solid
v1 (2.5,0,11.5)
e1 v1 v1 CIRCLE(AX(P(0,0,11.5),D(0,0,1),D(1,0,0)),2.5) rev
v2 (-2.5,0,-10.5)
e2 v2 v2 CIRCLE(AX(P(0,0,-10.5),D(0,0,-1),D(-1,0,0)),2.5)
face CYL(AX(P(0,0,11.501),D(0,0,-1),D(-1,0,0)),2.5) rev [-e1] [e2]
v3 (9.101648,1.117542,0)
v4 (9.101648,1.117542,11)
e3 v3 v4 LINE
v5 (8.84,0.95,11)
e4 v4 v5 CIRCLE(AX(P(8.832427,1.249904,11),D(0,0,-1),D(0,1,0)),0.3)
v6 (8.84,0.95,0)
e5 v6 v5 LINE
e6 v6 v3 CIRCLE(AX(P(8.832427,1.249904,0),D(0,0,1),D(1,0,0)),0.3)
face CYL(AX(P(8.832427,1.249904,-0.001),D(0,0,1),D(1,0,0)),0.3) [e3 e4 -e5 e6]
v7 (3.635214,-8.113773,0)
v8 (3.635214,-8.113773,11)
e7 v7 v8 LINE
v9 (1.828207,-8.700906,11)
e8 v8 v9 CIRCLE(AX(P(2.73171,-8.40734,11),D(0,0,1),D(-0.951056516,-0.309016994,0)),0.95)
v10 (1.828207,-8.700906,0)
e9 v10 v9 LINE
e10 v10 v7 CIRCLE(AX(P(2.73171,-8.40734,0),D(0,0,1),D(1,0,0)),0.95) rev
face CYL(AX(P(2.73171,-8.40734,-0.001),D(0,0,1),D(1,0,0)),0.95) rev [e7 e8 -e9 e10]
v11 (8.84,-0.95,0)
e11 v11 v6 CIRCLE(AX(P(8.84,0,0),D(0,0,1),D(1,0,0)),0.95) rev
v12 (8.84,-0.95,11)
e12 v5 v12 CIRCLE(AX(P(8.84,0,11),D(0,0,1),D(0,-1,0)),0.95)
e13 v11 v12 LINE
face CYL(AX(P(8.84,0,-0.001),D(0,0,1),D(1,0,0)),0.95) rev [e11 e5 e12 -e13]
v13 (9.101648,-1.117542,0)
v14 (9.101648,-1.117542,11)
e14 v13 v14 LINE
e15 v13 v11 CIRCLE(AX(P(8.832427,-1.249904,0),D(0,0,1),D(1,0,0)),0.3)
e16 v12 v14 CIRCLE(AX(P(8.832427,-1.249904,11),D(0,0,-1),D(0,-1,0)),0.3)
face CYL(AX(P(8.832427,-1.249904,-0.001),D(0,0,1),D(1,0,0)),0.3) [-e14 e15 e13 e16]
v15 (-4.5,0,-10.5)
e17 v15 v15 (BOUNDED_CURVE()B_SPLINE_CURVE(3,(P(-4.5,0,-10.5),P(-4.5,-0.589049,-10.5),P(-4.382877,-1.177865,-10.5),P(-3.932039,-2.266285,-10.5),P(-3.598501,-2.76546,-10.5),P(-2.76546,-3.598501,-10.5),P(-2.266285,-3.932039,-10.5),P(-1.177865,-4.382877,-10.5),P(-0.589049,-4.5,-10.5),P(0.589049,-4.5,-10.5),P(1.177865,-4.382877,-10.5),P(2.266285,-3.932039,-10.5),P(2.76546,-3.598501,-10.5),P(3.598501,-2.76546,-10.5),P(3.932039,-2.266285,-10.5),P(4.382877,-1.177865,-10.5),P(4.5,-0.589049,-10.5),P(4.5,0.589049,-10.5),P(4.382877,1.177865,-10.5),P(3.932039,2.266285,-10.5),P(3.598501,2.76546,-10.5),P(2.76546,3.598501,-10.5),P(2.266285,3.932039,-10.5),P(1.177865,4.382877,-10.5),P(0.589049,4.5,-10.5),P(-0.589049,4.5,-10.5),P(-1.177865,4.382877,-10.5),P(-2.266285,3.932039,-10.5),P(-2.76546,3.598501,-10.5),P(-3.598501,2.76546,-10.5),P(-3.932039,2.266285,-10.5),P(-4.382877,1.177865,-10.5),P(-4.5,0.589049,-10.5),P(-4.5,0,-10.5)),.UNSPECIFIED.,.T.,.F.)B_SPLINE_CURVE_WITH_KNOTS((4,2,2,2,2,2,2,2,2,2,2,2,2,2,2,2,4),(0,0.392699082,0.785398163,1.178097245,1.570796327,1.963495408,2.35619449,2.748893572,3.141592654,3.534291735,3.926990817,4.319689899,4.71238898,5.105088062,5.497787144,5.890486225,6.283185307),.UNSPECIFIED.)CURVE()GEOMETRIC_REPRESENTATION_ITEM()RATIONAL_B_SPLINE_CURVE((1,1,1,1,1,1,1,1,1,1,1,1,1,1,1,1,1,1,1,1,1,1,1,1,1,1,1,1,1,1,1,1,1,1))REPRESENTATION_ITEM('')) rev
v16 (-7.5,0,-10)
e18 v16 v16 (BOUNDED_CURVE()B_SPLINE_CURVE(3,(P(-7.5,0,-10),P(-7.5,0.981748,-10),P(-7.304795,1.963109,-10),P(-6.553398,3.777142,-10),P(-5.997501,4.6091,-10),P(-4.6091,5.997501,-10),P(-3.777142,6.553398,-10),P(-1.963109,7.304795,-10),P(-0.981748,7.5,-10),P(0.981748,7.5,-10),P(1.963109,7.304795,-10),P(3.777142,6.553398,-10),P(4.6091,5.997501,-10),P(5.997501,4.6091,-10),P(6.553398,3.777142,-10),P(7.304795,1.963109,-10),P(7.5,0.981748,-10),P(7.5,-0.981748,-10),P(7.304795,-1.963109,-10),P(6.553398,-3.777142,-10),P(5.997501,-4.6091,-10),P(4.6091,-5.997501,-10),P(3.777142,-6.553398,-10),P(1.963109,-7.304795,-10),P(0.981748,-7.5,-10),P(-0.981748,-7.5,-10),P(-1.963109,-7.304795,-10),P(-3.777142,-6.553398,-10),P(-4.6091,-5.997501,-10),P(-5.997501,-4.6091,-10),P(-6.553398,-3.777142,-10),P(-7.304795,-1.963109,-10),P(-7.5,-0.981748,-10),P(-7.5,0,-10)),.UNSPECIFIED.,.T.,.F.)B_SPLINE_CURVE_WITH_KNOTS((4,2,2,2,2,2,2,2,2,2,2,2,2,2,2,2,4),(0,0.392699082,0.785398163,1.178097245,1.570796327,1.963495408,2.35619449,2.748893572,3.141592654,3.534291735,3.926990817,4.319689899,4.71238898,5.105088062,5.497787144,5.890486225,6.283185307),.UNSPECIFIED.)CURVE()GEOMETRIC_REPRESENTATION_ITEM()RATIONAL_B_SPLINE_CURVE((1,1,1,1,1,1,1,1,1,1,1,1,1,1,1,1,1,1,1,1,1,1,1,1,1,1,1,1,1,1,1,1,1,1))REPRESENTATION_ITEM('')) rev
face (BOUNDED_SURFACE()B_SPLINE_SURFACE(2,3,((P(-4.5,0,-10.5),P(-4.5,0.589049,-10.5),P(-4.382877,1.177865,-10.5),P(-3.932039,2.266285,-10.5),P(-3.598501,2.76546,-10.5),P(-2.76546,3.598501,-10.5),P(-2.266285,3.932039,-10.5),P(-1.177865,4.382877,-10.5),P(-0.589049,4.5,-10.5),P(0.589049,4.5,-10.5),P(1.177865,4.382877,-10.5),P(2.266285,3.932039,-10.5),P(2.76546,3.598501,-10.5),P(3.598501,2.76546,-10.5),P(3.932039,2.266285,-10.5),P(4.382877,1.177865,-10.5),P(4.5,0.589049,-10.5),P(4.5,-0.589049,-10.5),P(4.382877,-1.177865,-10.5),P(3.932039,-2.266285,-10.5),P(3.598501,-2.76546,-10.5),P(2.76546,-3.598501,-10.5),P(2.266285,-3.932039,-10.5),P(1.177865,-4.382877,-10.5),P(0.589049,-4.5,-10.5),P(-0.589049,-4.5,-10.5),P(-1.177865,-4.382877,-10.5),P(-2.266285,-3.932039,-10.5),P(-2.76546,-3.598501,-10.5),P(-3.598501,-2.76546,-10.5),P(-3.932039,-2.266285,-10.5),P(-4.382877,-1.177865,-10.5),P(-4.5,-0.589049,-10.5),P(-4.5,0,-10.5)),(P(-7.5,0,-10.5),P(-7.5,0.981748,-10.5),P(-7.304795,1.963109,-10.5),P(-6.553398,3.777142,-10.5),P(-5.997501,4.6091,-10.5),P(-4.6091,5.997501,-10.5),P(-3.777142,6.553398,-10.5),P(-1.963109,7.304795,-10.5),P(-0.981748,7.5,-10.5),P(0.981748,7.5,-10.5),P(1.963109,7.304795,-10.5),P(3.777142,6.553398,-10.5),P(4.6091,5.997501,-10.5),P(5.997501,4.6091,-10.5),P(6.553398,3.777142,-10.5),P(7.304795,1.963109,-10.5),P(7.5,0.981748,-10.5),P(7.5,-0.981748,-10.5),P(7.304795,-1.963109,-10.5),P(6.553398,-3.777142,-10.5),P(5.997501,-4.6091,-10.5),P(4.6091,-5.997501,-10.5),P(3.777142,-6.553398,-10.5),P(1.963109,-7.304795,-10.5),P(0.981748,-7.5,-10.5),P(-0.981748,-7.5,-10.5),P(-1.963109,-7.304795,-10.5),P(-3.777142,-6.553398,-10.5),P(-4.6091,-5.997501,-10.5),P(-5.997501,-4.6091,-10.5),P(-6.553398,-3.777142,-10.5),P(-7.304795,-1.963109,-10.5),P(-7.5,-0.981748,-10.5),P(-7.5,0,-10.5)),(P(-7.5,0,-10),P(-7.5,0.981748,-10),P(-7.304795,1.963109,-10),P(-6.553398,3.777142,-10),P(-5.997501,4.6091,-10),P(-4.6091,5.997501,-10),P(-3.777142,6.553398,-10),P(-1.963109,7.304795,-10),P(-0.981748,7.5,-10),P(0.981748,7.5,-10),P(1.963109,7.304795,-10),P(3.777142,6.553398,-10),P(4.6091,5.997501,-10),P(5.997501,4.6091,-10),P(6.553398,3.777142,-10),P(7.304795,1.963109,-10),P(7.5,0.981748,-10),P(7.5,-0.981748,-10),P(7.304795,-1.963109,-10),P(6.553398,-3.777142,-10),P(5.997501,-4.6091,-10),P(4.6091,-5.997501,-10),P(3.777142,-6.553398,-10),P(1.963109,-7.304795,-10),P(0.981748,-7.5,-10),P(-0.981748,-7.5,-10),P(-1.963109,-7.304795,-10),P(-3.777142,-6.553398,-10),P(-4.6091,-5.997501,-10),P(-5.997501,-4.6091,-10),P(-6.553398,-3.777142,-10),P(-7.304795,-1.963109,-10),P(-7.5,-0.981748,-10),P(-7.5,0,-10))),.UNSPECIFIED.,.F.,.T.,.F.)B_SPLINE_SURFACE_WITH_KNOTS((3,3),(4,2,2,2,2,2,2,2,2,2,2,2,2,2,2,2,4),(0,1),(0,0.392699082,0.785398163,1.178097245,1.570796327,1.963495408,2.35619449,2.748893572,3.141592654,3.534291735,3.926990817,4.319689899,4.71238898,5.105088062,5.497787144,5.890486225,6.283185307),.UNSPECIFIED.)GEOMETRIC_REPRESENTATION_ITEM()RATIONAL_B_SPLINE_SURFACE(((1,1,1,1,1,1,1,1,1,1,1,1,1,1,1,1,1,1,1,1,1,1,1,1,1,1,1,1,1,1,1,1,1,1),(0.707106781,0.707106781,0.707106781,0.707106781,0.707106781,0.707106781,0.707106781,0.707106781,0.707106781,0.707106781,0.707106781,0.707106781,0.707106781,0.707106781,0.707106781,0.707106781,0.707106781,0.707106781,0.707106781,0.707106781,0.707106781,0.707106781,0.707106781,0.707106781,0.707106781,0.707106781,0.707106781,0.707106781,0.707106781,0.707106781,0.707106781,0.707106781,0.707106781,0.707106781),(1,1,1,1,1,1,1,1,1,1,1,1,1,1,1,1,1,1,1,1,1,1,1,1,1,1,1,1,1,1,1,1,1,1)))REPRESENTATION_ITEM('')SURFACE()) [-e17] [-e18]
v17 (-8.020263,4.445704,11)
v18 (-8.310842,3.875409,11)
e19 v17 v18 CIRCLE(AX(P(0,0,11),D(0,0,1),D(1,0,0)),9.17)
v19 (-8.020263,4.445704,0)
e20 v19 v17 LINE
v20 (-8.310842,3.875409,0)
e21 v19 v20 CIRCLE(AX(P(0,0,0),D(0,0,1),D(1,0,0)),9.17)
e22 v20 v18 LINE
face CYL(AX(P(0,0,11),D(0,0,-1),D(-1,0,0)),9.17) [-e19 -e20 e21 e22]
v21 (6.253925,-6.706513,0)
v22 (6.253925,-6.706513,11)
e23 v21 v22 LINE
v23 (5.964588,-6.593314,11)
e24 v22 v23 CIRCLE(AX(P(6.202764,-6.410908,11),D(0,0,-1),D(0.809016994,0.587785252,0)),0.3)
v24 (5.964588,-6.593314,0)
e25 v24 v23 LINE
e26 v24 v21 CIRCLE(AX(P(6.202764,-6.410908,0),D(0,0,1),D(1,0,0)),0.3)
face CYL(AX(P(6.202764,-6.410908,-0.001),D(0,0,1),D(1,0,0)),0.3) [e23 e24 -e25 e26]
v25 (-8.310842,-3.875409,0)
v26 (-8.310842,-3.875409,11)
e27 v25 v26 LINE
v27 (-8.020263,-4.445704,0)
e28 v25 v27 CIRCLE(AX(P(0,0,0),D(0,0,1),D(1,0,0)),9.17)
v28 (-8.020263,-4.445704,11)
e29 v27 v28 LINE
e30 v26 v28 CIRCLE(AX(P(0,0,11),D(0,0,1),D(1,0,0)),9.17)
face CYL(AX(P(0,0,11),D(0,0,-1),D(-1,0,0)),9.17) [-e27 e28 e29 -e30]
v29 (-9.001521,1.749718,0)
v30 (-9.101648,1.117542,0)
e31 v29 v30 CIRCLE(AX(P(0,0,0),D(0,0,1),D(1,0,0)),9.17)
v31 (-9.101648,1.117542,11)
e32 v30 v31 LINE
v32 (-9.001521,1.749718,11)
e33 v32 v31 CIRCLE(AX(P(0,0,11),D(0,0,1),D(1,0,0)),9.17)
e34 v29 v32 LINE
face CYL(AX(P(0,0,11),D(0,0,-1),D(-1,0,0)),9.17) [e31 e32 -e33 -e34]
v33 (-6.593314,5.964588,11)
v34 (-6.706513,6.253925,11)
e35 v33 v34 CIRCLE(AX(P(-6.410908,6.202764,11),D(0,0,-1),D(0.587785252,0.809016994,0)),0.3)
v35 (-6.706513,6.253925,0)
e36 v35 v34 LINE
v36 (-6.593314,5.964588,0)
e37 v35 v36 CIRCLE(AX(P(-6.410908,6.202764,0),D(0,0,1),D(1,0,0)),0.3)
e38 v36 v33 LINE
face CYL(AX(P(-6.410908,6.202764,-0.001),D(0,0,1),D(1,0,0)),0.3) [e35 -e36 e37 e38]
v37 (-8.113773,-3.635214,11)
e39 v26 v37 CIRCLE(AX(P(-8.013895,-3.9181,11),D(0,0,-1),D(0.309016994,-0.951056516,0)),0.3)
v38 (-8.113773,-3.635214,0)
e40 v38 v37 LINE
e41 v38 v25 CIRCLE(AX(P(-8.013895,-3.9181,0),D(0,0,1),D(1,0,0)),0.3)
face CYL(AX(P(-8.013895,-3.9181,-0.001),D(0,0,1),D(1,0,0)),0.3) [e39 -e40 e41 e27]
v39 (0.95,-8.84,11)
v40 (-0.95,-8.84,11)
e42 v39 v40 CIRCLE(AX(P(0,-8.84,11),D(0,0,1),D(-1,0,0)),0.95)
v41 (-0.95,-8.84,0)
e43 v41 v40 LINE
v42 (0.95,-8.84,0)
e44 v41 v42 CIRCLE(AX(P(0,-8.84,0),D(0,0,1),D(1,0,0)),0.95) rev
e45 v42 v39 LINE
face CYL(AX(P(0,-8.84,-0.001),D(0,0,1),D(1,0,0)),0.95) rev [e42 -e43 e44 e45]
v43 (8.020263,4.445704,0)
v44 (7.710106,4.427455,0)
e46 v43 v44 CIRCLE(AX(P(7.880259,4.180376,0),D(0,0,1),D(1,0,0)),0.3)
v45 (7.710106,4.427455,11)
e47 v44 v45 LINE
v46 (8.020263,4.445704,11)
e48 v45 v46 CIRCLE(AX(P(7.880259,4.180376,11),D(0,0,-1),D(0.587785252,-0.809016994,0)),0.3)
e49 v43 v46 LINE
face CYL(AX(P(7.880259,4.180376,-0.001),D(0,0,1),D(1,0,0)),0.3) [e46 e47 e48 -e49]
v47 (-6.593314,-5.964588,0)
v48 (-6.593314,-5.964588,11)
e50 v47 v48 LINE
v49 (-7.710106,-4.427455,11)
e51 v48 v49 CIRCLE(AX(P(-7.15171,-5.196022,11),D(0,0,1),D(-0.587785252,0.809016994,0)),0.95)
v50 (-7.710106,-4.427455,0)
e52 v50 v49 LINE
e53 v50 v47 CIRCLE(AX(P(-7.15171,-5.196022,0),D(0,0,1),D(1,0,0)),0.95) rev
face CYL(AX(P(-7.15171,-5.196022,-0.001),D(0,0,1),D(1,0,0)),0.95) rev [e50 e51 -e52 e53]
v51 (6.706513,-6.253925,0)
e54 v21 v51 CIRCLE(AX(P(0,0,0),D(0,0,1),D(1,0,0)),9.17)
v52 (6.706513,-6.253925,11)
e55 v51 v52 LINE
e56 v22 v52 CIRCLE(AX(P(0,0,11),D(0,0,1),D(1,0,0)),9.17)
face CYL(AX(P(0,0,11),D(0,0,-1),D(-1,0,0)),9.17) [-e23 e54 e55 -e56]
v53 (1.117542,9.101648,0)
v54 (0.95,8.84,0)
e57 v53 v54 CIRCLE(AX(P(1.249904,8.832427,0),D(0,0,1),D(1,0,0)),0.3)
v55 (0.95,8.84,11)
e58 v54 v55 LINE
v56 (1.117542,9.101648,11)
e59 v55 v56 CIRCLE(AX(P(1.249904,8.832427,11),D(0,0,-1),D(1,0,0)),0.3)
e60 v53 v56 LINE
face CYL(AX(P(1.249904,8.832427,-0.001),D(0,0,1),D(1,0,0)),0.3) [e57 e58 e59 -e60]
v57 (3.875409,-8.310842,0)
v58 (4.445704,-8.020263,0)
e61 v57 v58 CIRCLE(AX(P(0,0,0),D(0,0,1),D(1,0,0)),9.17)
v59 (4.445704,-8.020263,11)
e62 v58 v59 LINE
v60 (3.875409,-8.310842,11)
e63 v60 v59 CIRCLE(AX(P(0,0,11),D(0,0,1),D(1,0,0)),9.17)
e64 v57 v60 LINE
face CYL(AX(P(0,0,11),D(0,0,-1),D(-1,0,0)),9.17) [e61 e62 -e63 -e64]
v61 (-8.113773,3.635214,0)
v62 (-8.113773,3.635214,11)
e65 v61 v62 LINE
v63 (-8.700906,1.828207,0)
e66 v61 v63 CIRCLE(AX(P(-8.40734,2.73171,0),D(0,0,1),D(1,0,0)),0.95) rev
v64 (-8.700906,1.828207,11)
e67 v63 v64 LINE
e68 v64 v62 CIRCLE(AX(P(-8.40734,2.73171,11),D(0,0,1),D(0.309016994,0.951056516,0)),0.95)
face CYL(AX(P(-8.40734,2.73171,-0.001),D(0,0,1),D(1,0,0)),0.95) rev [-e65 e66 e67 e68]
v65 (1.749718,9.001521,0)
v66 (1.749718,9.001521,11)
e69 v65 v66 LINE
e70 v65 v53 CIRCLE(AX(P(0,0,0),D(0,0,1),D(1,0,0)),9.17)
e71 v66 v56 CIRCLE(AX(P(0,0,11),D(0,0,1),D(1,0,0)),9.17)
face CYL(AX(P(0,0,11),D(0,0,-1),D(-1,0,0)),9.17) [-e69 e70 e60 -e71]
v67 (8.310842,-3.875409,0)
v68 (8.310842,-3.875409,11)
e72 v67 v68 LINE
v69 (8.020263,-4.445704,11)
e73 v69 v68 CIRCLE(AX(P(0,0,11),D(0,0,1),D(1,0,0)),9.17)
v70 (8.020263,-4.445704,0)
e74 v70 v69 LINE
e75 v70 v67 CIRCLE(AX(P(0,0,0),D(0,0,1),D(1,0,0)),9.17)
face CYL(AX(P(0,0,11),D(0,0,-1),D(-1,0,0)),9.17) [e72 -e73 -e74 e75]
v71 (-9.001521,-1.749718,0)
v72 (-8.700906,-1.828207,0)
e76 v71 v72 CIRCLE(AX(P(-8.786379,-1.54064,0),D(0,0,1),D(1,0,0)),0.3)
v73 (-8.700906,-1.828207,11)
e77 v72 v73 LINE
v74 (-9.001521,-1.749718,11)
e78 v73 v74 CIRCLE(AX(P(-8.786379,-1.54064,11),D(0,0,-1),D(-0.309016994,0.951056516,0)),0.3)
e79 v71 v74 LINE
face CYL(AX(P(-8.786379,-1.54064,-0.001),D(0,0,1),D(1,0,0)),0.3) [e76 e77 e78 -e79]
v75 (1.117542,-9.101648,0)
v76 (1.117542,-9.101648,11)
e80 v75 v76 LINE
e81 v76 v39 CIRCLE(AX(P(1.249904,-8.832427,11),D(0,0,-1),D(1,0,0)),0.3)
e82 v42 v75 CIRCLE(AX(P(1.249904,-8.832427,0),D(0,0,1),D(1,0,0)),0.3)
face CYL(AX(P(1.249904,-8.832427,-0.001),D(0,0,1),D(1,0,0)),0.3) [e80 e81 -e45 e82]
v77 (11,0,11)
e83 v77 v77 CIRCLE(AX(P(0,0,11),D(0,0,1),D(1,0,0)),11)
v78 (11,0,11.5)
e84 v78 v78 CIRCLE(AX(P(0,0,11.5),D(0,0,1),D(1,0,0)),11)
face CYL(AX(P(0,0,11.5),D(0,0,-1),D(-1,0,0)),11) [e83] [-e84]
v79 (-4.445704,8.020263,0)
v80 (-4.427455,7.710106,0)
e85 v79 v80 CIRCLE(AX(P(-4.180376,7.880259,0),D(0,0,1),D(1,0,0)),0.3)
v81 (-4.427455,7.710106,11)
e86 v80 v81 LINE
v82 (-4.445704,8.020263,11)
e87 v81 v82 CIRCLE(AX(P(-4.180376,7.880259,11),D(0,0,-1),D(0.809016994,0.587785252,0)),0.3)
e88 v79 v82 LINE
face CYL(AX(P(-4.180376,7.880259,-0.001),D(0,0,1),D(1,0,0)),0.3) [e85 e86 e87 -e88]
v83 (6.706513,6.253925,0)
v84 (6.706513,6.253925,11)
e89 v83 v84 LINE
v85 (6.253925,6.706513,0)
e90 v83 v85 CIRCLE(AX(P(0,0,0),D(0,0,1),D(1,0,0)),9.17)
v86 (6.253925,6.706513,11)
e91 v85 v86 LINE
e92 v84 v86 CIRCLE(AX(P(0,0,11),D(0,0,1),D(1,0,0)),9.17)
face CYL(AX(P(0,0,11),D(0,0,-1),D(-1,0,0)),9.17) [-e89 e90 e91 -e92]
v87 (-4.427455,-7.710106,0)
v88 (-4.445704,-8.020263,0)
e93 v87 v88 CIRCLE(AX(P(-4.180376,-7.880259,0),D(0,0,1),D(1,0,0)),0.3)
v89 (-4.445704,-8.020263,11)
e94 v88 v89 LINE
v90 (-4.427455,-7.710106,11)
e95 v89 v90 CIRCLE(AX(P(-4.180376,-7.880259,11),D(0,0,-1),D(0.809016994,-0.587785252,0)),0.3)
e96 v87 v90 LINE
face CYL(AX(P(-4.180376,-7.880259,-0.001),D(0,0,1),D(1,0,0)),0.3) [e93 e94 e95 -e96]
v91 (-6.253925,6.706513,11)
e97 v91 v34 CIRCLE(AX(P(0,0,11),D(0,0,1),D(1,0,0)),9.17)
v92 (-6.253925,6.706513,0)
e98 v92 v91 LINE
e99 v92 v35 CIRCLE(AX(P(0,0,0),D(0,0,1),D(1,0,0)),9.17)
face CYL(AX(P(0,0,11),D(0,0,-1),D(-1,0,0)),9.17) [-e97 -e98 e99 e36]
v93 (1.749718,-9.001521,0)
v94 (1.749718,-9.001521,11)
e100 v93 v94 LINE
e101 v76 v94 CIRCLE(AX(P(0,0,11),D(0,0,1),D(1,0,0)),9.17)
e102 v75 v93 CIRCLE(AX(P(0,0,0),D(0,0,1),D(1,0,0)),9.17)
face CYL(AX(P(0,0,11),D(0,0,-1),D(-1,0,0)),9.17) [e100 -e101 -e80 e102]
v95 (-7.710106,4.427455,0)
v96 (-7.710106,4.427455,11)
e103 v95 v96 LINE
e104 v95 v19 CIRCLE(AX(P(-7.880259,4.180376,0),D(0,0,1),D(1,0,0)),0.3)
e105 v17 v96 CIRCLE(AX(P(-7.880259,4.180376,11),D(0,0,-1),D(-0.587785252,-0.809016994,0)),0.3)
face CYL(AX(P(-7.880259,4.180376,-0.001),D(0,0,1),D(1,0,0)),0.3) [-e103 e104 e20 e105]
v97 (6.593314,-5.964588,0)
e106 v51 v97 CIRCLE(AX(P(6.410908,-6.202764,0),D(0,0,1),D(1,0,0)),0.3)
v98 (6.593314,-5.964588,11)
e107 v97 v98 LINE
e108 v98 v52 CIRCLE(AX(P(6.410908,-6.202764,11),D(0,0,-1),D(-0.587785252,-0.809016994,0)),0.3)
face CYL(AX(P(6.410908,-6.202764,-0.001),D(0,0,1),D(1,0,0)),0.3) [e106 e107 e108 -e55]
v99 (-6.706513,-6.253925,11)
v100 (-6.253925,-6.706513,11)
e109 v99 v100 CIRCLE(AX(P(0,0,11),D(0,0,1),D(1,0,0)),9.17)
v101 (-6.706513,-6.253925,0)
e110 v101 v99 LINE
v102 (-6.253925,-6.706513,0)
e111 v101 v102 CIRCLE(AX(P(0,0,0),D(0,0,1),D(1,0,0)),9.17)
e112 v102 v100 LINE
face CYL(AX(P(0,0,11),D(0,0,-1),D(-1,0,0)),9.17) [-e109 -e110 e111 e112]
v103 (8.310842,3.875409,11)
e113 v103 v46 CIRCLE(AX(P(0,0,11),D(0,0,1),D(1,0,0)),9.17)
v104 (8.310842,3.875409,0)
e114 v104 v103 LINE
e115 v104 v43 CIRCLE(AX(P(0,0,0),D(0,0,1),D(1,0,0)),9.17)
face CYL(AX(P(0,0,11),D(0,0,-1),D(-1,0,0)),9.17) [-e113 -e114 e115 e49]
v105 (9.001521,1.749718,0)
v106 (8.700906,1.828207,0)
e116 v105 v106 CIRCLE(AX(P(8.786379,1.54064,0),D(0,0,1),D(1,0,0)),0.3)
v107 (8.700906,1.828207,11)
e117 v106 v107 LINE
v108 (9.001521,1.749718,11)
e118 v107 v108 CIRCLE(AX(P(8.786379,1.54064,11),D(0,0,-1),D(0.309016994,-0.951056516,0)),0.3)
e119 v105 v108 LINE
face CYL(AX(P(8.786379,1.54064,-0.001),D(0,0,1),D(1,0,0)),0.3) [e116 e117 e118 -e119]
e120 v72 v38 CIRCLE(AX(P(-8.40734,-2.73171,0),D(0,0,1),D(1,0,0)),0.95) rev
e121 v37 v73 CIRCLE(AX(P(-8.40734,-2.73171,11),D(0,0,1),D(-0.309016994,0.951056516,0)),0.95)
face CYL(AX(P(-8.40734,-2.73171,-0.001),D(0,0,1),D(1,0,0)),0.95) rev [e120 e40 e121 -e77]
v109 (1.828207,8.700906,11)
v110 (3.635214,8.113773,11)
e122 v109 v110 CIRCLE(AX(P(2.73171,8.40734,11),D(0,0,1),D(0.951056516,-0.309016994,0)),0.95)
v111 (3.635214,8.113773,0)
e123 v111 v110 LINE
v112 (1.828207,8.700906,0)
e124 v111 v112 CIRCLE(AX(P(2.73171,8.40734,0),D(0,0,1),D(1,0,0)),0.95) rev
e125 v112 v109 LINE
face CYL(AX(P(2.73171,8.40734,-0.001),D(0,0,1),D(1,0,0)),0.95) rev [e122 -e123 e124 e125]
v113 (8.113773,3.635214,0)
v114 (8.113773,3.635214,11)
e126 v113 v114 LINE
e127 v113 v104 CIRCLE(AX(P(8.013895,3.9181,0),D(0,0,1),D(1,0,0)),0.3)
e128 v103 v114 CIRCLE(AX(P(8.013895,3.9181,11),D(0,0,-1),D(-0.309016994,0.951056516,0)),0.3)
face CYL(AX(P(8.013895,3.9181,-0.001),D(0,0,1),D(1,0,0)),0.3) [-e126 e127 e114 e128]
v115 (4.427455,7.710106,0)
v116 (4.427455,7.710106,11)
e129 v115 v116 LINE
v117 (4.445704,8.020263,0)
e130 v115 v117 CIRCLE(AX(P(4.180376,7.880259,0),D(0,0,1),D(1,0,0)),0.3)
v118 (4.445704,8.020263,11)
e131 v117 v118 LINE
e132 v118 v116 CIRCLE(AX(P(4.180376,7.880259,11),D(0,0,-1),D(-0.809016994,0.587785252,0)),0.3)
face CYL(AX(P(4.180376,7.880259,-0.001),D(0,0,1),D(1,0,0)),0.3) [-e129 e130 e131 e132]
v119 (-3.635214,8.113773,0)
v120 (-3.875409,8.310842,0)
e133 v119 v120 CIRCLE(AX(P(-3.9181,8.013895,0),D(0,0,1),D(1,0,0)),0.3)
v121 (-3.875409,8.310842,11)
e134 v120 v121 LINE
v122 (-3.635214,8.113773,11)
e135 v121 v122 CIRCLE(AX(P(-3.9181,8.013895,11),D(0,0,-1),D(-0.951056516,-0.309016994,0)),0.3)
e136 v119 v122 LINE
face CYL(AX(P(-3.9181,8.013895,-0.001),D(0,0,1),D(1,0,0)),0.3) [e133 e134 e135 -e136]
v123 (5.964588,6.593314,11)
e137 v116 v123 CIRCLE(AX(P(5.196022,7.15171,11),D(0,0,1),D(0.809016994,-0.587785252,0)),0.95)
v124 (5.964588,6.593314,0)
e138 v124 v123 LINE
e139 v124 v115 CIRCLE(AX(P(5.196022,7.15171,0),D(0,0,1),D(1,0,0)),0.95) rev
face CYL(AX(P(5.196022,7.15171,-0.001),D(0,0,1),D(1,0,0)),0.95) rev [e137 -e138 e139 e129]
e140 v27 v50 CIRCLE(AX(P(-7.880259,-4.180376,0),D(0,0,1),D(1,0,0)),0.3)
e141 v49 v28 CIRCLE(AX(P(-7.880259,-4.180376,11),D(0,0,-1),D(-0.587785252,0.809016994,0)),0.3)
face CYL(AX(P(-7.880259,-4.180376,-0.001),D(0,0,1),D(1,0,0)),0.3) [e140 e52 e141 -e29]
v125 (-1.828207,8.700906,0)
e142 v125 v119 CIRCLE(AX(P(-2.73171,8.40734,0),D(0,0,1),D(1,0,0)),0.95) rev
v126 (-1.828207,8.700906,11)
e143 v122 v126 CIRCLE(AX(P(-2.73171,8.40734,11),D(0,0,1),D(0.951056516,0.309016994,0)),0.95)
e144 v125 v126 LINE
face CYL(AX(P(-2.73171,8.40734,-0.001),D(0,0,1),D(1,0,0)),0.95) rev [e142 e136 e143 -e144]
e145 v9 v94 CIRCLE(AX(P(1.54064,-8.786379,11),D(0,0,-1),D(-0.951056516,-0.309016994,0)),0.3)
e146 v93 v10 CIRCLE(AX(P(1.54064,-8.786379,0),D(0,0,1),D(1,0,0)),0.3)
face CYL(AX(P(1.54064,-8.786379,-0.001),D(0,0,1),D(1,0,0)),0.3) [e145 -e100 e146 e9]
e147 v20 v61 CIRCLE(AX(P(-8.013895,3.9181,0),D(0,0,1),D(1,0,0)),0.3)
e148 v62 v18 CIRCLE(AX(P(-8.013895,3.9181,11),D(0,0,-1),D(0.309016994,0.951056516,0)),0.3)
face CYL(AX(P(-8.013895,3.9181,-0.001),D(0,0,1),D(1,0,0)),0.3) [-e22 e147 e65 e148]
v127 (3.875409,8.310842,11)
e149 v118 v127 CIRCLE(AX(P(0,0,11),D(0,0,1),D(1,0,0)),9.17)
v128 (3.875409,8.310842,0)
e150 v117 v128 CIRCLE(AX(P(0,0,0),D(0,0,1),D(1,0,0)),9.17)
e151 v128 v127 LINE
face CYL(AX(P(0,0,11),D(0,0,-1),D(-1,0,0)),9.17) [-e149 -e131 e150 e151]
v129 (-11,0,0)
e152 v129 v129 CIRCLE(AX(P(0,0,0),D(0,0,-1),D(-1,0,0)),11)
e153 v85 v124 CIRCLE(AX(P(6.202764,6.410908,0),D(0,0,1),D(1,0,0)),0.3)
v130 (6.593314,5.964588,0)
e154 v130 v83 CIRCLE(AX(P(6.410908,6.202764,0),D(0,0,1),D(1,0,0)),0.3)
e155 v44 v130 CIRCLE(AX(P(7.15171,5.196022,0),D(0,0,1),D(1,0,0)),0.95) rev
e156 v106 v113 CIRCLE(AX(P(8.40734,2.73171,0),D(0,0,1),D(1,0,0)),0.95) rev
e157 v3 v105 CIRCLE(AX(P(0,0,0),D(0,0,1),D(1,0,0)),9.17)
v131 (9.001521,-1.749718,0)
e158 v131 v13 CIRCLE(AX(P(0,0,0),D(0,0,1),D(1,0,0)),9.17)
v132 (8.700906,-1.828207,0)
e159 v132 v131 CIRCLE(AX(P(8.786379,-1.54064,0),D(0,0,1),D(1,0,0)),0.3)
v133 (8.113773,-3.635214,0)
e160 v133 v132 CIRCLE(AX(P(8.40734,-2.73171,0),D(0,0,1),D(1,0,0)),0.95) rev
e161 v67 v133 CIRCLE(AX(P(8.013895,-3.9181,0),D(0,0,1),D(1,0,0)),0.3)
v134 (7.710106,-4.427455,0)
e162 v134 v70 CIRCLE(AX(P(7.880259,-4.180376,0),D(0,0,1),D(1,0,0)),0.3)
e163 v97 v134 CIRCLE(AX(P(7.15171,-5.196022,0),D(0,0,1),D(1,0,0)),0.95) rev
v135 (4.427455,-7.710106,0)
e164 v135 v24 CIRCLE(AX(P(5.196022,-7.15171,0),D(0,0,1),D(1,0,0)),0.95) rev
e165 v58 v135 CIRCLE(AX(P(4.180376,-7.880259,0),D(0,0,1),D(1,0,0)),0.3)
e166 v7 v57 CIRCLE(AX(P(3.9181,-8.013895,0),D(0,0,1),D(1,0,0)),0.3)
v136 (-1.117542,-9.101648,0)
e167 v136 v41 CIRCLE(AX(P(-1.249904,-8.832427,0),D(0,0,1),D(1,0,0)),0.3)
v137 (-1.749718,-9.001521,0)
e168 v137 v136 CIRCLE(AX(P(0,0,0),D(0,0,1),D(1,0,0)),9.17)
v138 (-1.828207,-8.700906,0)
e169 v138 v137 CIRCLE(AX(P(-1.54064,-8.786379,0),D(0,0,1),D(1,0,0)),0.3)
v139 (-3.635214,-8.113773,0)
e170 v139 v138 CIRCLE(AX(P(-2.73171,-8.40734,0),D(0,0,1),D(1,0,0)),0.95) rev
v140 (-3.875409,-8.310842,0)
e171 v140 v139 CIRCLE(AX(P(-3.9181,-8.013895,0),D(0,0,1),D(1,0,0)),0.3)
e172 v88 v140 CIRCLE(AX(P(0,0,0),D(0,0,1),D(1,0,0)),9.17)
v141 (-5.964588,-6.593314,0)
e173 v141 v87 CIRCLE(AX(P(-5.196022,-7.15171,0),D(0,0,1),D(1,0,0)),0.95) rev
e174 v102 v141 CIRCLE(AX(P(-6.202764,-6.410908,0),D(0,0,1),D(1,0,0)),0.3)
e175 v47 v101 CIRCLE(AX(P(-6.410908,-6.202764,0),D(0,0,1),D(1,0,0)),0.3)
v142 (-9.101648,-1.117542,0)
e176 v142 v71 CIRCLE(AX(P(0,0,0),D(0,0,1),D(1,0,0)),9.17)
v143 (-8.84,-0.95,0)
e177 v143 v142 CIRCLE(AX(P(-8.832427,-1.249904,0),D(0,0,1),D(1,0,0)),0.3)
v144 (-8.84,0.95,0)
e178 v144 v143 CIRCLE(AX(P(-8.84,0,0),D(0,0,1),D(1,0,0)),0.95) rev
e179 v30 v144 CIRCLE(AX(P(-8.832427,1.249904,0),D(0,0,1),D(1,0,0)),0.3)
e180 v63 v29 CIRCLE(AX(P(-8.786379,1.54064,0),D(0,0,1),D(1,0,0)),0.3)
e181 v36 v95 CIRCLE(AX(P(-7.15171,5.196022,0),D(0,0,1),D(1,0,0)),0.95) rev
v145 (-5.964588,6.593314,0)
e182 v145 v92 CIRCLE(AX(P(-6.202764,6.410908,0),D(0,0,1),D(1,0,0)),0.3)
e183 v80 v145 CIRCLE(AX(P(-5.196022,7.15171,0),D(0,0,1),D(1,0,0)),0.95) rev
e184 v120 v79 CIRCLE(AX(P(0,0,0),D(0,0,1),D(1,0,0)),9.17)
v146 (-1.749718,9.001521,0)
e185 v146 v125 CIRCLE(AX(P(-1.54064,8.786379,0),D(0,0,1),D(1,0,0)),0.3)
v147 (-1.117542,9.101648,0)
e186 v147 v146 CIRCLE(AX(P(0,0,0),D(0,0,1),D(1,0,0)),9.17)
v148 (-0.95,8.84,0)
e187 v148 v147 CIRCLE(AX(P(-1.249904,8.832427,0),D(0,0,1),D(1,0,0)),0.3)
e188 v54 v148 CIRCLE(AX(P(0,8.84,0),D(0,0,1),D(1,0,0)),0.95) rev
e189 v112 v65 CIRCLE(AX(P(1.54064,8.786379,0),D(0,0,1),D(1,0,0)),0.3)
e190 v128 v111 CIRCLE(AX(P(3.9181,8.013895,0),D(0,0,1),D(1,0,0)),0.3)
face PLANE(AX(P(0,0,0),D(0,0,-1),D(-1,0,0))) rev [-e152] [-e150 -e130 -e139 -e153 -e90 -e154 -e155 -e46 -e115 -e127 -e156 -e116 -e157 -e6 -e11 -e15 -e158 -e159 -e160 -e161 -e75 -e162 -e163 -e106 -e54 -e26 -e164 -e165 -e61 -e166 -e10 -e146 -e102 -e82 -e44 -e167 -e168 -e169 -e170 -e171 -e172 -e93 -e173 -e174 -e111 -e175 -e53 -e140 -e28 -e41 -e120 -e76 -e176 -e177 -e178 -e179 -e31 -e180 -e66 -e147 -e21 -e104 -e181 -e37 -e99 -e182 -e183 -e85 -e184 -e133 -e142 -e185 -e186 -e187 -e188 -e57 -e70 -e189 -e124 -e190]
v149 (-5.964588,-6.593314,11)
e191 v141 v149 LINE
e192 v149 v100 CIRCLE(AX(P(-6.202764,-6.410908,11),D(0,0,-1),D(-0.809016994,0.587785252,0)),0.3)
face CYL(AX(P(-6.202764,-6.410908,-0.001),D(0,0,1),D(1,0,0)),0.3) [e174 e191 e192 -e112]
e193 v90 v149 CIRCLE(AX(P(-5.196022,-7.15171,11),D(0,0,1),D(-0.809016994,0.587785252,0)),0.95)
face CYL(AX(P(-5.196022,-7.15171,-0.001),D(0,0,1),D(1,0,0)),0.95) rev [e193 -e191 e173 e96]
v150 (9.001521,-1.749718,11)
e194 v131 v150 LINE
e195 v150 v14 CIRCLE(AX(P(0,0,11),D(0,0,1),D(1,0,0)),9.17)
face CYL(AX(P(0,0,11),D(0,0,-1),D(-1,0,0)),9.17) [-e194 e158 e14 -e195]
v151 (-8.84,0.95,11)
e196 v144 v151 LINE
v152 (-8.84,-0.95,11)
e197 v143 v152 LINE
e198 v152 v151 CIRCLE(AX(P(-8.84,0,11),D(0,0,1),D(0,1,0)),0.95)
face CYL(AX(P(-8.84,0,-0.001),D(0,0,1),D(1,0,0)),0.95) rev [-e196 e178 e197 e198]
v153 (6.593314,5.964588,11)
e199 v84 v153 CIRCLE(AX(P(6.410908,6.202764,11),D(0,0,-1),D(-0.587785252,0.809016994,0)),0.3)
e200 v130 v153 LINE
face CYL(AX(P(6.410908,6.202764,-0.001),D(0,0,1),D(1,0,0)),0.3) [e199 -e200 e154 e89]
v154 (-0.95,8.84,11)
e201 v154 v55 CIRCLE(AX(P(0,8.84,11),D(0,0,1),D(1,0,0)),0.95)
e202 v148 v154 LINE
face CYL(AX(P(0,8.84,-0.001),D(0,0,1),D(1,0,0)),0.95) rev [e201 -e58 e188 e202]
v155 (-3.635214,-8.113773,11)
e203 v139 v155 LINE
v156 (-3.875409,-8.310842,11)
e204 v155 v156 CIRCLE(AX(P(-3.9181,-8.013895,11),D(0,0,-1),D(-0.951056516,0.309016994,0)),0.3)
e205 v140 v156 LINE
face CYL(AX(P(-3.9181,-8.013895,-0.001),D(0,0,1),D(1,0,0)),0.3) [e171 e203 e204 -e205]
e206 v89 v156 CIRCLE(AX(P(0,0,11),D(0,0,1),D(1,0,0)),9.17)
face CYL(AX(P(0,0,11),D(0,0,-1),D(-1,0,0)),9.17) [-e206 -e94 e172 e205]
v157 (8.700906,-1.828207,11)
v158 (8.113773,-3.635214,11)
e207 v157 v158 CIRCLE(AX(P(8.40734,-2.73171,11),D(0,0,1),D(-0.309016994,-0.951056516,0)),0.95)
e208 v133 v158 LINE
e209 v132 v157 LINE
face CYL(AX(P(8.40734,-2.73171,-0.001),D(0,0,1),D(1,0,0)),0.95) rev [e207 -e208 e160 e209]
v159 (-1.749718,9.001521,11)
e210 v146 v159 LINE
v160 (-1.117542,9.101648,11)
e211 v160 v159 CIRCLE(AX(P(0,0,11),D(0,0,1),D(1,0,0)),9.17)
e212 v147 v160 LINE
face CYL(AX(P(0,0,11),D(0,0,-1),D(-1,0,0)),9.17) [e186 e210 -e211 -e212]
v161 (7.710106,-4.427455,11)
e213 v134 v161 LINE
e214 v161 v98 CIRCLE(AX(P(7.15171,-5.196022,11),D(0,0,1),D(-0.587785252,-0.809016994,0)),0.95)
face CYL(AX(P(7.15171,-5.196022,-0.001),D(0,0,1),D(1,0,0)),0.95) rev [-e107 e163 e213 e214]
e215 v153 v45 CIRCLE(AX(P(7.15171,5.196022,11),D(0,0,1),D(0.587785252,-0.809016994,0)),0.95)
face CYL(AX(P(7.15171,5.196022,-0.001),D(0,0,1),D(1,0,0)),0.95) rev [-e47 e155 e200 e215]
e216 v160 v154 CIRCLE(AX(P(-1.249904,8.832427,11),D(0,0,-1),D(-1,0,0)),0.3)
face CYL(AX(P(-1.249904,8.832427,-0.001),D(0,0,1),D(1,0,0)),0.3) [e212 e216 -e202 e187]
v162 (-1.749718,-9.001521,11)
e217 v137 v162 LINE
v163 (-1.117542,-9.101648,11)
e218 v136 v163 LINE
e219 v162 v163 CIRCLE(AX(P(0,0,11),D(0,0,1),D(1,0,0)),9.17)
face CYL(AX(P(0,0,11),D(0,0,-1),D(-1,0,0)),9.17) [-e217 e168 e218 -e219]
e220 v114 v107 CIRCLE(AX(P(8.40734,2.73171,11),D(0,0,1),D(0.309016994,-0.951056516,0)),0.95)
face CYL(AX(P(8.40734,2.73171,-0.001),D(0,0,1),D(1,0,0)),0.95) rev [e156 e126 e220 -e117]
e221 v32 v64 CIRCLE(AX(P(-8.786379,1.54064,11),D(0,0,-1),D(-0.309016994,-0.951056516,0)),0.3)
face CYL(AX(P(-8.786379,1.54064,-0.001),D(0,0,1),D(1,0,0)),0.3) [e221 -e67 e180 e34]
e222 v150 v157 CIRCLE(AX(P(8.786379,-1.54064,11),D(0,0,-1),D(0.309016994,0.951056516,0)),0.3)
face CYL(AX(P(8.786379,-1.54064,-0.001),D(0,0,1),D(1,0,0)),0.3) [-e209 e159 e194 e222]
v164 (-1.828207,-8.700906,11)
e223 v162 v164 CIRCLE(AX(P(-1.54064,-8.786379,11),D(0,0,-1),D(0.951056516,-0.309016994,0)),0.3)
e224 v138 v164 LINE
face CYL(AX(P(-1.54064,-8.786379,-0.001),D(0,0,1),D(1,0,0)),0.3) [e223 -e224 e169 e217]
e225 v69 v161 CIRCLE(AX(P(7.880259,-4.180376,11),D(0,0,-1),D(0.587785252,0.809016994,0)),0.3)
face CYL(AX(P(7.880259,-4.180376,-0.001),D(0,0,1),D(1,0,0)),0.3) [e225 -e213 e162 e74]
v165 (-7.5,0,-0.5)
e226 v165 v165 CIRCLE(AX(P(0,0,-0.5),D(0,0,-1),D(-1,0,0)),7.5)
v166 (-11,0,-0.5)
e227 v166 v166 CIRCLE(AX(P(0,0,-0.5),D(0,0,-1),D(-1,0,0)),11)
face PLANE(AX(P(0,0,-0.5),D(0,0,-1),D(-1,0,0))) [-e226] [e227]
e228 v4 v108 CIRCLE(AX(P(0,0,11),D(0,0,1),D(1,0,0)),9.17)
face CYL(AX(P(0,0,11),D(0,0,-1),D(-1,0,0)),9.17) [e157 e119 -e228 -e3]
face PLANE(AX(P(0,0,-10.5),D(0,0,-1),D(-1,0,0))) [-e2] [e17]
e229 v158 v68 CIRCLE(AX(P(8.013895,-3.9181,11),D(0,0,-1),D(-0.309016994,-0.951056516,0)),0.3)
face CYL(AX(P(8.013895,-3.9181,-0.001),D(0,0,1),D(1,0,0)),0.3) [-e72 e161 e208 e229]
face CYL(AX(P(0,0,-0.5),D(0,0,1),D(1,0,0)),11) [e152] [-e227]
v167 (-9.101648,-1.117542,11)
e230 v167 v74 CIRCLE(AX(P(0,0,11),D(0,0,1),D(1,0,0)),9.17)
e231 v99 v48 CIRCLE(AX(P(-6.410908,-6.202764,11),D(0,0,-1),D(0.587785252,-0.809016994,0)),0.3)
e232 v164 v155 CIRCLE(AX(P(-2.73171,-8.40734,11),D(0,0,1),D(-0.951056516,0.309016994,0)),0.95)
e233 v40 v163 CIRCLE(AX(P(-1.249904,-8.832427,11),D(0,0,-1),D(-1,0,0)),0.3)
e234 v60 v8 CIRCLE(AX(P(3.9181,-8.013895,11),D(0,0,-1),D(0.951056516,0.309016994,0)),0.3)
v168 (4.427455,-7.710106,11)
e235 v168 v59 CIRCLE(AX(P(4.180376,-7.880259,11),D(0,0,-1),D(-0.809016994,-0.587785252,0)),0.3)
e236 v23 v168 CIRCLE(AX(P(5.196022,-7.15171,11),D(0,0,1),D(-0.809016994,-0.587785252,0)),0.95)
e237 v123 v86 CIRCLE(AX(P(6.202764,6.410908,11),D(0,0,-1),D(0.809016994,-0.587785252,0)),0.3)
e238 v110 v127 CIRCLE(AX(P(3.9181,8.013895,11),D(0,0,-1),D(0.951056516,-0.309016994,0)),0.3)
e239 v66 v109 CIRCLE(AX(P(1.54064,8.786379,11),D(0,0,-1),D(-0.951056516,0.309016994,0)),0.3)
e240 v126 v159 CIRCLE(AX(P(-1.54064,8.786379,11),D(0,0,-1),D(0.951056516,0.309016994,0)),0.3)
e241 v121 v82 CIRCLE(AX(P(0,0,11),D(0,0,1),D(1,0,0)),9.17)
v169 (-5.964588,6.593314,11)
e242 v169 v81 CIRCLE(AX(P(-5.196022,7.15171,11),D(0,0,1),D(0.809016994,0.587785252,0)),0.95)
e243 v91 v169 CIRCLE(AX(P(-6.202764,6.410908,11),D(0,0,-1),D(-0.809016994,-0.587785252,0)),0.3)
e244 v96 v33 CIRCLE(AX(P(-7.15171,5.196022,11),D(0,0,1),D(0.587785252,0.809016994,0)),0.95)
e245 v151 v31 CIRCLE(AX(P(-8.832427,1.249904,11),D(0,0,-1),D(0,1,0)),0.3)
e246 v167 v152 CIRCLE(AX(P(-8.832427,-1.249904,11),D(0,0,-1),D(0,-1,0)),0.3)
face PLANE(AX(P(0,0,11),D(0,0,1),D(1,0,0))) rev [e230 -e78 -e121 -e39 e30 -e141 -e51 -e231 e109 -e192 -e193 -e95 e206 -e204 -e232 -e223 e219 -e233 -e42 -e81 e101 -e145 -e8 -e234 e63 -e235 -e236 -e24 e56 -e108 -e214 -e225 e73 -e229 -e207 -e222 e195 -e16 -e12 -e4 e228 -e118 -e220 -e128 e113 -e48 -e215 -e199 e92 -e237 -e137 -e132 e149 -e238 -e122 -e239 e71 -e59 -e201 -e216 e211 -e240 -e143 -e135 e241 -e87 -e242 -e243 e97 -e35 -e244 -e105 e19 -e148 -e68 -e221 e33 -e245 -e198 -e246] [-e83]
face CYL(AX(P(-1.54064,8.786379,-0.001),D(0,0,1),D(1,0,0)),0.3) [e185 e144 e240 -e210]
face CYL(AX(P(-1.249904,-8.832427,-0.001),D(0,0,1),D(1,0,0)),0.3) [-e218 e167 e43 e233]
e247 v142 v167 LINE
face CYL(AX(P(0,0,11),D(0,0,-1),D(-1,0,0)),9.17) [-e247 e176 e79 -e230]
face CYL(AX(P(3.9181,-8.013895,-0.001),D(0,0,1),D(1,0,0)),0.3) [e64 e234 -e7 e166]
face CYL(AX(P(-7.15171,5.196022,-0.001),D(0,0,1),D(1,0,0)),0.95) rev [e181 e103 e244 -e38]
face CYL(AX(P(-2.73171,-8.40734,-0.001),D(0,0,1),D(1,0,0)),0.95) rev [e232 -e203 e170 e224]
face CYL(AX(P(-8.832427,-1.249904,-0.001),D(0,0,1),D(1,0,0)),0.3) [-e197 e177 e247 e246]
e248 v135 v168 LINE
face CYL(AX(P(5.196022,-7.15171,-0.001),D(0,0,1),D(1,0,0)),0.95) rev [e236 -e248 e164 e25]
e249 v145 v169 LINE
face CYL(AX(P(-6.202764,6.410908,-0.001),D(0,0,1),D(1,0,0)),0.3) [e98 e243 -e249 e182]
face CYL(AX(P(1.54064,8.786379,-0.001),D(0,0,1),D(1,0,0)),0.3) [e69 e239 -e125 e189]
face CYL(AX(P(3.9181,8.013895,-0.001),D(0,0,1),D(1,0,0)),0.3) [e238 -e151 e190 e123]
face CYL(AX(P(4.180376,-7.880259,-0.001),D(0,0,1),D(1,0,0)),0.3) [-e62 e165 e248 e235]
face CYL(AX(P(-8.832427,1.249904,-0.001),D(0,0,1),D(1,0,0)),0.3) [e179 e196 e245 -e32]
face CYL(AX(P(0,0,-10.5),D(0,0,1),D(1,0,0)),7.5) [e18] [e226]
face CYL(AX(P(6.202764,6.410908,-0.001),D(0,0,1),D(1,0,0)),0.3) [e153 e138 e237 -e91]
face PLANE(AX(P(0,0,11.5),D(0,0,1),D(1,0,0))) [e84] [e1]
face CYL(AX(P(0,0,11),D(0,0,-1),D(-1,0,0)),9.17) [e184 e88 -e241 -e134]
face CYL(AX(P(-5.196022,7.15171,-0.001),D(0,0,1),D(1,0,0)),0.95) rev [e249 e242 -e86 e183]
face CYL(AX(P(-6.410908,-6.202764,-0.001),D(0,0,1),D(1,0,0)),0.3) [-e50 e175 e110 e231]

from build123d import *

# Parameters (mm, degrees)
SKETCH_1_R               = 9.17
EXTRUDE_1_DEPTH          = 11
CUT_EXTRUDE_1_REACH      = 19.005
PATTERN_CIRCULAR_1_COUNT = 20
SKETCH_3_R               = 11
EXTRUDE_2_DEPTH          = 0.5
EXTRUDE_START            = 0.5
SKETCH_4_R               = 11
EXTRUDE_3_DEPTH          = 0.5
SKETCH_5_R               = 7.5
EXTRUDE_4_DEPTH          = 10
CUT_EXTRUDE_2_REACH      = 28.944
SKETCH_6_R               = 2.5
FILLET_1_SIZE            = 0.5
FILLET_1_SIZE_2          = 3


with BuildPart() as part:
    # 草圖1 → 填料-伸長1 (new body)
    with BuildSketch(Plane.XY):
        Circle(SKETCH_1_R)
    extrude(amount=EXTRUDE_1_DEPTH)

    # 草圖2 → 除料-伸長1 (cut, up to next)
    with BuildSketch(Plane.XY.offset(11), mode=Mode.PRIVATE) as cut_extrude_1_sk1:
        with BuildLine():
            ThreePointArc((-1.117541879, 9.101648211), (0, 9.17), (1.117541879, 9.101648211))
            ThreePointArc((1.117541879, 9.101648211), (0.997261135, 8.994202524), (0.95, 8.84))
            ThreePointArc((0.95, 8.84), (0, 7.89), (-0.95, 8.84))
            ThreePointArc((-0.95, 8.84), (-0.997261135, 8.994202524), (-1.117541879, 9.101648211))
        make_face()
    cut_extrude_1_tool1 = extrude(cut_extrude_1_sk1.sketch, amount=-CUT_EXTRUDE_1_REACH, mode=Mode.PRIVATE) & part.part
    cut_extrude_1 = cut_extrude_1_tool1.solids().sort_by_distance((0, 8.608887, 11))[0]
    add(cut_extrude_1, mode=Mode.SUBTRACT)

    # 環狀複製排列1: 除料-伸長1 ×20 about axis
    pattern_circular_1_axis = Axis((0, 0, 0), (0, 0, 1))
    for i in range(1, PATTERN_CIRCULAR_1_COUNT):
        add(cut_extrude_1.rotate(pattern_circular_1_axis, i * 360 / PATTERN_CIRCULAR_1_COUNT), mode=Mode.SUBTRACT)

    # 草圖3 → 填料-伸長2 (add)
    with BuildSketch(Plane.XY.offset(11)):
        Circle(SKETCH_3_R)
    extrude(amount=EXTRUDE_2_DEPTH)

    # 草圖4 → 填料-伸長3 (add)
    with BuildSketch(Plane(origin=(0, 0, 0), x_dir=(-1, 0, 0), z_dir=(0, 0, -1)).offset(EXTRUDE_START)):
        with Locations(Location((0, 0, 0), (0, 0, 180))):
            Circle(SKETCH_4_R)
    extrude(amount=-EXTRUDE_3_DEPTH)

    # 草圖5 → 填料-伸長4 (add)
    with BuildSketch(Plane(origin=(0, 0, -0.5), x_dir=(-1, 0, 0), z_dir=(0, 0, -1))):
        Circle(SKETCH_5_R)
    extrude(amount=EXTRUDE_4_DEPTH)

    # 草圖6 → 除料-伸長2 (cut, up to next)
    with BuildSketch(Plane(origin=(0, 0, -10.5), x_dir=(-1, 0, 0), z_dir=(0, 0, -1)), mode=Mode.PRIVATE) as cut_extrude_2_sk1:
        Circle(SKETCH_6_R)
    cut_extrude_2_tool1 = extrude(cut_extrude_2_sk1.sketch, amount=-CUT_EXTRUDE_2_REACH, mode=Mode.PRIVATE) & part.part
    add(cut_extrude_2_tool1.solids().sort_by_distance((0, 0, -10.5))[0], mode=Mode.SUBTRACT)

    # 圓角1
    # an asymmetric fillet: 3, 0.5 mm, written as the material it takes off along each edge
    with BuildSketch(Plane(origin=(0, 0, -10.5), x_dir=(-1, 0, 0), z_dir=(0, -1, 0))) as fillet_1_piece_1:
        with BuildLine():
            Bezier((7.5, -FILLET_1_SIZE), (7.5, 0), (7.5 - FILLET_1_SIZE_2, 0), weights=[1, 0.707106781, 1])
            Line((7.5 - FILLET_1_SIZE_2, 0), (7.5, 0))
            Line((7.5, 0), (7.5, -FILLET_1_SIZE))
        make_face()
    revolve(axis=Axis((0, 0, -10.5), (0, 0, -1)), mode=Mode.SUBTRACT)


solid = part.part
